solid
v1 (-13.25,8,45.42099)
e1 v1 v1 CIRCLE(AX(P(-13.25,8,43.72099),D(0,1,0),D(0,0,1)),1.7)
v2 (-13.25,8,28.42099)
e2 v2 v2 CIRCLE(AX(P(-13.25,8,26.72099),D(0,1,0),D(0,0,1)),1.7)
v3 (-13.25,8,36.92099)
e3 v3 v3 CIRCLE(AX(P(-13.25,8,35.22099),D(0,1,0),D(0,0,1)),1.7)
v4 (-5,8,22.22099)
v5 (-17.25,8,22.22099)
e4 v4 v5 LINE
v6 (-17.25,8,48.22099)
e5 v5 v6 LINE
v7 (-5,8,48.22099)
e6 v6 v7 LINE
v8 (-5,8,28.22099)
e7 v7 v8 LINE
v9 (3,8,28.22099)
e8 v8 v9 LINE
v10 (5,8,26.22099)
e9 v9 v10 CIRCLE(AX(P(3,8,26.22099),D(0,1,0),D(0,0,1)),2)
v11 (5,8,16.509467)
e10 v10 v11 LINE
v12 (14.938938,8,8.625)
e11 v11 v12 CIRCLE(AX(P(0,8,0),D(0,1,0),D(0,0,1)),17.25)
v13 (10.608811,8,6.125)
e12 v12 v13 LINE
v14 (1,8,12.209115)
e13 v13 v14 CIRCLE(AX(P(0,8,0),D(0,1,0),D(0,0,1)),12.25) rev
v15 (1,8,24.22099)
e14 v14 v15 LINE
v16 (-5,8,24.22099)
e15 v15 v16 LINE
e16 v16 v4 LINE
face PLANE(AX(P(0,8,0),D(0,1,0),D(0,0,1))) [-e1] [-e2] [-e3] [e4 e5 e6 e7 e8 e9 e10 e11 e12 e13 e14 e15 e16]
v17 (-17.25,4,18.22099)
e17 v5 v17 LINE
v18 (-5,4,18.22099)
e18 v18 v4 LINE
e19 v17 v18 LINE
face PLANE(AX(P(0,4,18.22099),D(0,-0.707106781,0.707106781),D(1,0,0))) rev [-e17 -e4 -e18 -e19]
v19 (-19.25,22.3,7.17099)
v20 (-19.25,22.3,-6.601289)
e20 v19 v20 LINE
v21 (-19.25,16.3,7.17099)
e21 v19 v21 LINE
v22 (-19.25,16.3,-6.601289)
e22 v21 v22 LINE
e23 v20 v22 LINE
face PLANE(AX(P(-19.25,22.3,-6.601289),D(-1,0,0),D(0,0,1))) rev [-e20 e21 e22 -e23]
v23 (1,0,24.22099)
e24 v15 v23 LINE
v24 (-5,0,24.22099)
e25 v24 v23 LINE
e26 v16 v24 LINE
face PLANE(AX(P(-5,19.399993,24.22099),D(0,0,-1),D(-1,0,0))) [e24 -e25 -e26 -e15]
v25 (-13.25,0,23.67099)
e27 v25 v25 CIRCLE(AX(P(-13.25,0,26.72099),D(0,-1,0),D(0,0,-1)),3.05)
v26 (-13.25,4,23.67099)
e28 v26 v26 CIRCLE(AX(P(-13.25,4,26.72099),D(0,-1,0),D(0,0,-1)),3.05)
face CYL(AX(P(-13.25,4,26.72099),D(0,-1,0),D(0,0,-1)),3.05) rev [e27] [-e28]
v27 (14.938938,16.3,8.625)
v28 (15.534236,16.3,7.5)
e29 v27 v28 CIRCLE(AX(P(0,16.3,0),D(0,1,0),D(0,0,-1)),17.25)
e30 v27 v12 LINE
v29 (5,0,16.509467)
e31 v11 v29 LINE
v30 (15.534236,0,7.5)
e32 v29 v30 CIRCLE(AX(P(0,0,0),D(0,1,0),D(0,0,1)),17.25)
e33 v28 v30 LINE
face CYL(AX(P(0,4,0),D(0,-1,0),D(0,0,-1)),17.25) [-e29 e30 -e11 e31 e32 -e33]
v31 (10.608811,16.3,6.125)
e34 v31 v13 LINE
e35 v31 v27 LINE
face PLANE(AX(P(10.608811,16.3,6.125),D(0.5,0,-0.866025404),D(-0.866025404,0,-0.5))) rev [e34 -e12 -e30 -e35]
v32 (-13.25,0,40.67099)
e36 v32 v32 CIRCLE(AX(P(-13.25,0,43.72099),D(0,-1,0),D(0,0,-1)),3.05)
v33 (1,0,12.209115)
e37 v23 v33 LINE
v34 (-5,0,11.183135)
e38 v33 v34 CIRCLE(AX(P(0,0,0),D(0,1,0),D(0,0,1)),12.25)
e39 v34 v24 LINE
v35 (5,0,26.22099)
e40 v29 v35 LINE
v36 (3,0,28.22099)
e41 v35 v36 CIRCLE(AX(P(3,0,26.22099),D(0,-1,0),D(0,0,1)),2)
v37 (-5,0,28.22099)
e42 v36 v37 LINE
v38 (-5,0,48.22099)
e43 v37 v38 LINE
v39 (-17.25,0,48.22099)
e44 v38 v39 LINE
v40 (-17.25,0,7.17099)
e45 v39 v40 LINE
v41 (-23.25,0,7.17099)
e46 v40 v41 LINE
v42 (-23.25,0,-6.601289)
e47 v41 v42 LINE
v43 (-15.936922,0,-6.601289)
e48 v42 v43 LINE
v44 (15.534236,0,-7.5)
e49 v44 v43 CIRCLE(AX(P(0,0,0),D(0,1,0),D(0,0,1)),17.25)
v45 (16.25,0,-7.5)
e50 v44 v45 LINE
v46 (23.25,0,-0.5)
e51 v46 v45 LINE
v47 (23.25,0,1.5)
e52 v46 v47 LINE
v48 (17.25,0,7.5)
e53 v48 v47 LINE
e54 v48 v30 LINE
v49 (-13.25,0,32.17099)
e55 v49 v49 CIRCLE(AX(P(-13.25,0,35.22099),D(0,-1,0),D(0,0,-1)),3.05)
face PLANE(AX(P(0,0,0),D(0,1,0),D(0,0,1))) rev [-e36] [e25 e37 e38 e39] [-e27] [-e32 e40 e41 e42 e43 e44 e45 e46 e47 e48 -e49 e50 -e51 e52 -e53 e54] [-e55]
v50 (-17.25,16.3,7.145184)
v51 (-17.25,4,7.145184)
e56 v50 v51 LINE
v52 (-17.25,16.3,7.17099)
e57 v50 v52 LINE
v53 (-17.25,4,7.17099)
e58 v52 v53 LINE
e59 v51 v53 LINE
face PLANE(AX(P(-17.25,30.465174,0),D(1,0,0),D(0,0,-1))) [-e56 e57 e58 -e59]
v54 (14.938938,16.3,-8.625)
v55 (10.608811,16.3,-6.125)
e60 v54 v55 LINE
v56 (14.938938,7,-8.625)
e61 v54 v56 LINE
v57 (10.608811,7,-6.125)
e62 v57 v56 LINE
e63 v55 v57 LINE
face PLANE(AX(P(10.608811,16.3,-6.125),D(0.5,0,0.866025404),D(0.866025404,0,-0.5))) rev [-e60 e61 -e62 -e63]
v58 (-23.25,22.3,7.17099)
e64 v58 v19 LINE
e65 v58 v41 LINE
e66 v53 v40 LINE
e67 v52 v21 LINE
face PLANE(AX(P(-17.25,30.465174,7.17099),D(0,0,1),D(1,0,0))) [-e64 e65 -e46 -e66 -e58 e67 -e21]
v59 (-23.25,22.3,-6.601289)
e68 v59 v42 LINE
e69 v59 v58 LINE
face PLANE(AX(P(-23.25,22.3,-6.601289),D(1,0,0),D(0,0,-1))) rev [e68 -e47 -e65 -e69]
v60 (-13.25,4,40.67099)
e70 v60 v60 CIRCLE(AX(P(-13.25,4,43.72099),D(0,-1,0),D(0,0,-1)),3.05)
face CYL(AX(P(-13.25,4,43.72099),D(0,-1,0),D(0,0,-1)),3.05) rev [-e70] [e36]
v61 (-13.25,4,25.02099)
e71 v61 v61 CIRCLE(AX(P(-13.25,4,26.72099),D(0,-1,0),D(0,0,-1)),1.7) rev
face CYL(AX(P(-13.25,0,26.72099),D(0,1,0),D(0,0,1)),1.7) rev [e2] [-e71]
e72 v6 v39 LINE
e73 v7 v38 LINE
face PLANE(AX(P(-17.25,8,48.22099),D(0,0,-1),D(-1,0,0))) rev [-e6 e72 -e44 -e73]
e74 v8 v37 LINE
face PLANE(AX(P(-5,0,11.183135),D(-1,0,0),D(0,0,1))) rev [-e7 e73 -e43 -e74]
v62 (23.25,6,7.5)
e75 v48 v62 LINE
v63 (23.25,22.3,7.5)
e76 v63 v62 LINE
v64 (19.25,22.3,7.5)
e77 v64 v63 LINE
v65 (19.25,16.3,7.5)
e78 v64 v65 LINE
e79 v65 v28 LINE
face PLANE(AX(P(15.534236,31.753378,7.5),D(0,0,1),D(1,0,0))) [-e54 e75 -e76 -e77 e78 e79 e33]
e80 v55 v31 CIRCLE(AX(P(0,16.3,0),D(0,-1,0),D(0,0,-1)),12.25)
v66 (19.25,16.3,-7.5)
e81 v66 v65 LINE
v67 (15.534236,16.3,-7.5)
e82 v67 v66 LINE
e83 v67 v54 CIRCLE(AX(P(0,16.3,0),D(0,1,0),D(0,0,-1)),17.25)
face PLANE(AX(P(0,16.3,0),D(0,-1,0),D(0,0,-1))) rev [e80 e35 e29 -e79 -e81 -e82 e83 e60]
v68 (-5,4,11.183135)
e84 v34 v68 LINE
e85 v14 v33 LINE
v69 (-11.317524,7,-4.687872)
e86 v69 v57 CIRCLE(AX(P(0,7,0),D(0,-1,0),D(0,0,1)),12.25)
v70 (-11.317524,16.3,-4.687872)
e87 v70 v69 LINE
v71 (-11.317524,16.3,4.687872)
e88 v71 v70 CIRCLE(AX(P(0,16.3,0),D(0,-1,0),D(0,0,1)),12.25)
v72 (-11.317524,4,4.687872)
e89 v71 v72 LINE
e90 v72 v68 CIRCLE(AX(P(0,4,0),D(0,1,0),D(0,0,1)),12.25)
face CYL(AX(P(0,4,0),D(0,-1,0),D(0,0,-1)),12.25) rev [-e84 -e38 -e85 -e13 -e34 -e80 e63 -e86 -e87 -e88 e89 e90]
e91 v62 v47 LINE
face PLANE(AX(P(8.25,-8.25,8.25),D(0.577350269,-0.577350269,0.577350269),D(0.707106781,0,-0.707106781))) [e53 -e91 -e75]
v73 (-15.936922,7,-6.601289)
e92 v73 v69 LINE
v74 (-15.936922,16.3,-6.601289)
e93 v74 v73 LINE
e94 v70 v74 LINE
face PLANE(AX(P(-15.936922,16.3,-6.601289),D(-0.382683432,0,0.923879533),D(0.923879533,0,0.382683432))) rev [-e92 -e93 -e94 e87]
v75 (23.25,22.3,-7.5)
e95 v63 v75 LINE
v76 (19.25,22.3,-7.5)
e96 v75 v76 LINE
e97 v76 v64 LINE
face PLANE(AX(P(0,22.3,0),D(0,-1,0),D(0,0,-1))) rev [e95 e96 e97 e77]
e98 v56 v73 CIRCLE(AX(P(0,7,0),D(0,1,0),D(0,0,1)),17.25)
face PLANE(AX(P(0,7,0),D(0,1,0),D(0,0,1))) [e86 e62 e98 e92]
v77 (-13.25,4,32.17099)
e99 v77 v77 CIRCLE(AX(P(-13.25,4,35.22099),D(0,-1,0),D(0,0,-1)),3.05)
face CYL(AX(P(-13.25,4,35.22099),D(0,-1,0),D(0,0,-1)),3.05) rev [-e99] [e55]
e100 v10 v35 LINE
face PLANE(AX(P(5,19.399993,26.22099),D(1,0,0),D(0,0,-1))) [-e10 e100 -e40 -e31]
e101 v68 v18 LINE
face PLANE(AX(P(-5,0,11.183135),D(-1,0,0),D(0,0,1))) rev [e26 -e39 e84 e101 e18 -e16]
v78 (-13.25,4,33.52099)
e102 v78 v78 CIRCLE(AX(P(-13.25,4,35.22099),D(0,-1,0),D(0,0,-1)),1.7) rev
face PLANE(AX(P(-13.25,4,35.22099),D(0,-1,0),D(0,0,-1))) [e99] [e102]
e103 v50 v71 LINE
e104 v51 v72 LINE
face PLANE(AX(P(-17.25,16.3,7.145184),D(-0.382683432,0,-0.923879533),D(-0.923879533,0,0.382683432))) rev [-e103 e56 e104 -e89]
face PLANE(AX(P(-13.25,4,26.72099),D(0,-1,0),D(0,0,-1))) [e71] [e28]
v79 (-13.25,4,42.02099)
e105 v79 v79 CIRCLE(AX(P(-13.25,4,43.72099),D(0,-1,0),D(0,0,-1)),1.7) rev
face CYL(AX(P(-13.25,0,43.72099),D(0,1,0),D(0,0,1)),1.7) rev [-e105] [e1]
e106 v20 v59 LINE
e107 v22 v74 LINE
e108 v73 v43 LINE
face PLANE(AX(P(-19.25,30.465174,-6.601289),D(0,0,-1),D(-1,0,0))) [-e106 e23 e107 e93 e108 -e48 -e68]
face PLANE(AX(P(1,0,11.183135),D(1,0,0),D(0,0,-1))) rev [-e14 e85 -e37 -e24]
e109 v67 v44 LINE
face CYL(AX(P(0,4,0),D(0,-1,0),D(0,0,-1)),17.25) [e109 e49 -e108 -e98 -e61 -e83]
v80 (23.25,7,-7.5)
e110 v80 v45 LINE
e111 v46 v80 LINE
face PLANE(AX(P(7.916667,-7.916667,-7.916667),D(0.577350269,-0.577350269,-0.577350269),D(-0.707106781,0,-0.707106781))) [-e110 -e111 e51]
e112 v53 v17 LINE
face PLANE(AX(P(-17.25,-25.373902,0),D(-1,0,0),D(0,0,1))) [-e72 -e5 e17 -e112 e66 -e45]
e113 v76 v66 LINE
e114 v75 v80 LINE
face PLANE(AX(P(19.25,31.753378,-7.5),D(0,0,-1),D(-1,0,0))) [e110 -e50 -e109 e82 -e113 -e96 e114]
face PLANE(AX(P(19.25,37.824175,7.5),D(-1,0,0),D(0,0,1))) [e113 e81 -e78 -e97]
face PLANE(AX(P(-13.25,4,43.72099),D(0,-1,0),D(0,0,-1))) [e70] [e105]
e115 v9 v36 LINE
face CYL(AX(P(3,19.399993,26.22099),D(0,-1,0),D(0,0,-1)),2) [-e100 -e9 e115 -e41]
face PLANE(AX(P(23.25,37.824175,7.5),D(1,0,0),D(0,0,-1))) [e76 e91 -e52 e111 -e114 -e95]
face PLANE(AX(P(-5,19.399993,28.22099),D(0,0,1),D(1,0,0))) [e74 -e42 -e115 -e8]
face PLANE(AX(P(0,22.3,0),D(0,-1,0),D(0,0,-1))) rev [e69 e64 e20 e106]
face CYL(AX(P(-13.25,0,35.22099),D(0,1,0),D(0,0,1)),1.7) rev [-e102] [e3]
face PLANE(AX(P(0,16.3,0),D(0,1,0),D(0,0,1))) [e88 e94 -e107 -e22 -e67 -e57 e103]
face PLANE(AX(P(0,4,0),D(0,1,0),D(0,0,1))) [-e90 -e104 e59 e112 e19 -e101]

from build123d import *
from build123d.topology import SkipClean

# Parameters (mm, degrees)
SKETCH1_R                = 17.25
SKETCH1_R_2              = 12.25
BOSS_EXTRUDE1_DEPTH      = 4
SKETCH2_W                = 6
SKETCH2_H                = 6.066865377
CUT_EXTRUDE1_DEPTH       = 25.720942539
BOSS_EXTRUDE2_START      = -4
BOSS_EXTRUDE2_DEPTH      = 4
BOSS_EXTRUDE3_DEPTH      = 12.3
BOSS_EXTRUDE4_DEPTH      = 4
BOSS_EXTRUDE4_DEPTH_BACK = 4
SKETCH5_W                = 12.25
SKETCH5_H                = 26
CUT_EXTRUDE2_DEPTH       = 53.669881205
CUT_EXTRUDE2_DEPTH_BACK  = 53.669881205
SKETCH6_R                = 1.7
SKETCH7_R                = 3.05
CUT_EXTRUDE6_DEPTH       = 4
CHAMFER1_SIZE            = 4
BOSS_EXTRUDE5_REACH      = 55.745
BOSS_EXTRUDE6_DEPTH      = 6
BOSS_EXTRUDE6_DEPTH_BACK = 16.3
SKETCH9_W                = 4
SKETCH9_H                = 13.772279307
BOSS_EXTRUDE7_DEPTH      = 4
BOSS_EXTRUDE8_DEPTH      = 16.3
SKETCH12_W               = 4
SKETCH12_H               = 15
BOSS_EXTRUDE9_DEPTH      = 22.3
CHAMFER2_START           = 13.712068893
CHAMFER2_OUTLINE_W       = 11
CHAMFER2_OUTLINE_H       = 13
CHAMFER2_DEPTH           = 5.287931107
CHAMFER3_START           = 14.289419162
CHAMFER3_OUTLINE_W       = 10
CHAMFER3_OUTLINE_H       = 11
CHAMFER3_DEPTH           = 10.664231106
BOSS_EXTRUDE10_DEPTH     = 3
BOSS_EXTRUDE11_DEPTH     = 4


with BuildPart() as part:
    # Sketch1 → Boss-Extrude1 (new body)
    with BuildSketch(Plane(origin=(0, 0, 0), x_dir=(1, 0, 0), z_dir=(0, 1, 0))):
        with Locations(Location((0, 0, 0), (0, 0, 270))):
            Circle(SKETCH1_R)
        with Locations(Location((0, 0, 0), (0, 0, 270))):
            Circle(SKETCH1_R_2, mode=Mode.SUBTRACT)
    extrude(amount=BOSS_EXTRUDE1_DEPTH)

    # Sketch2 → Cut-Extrude1 (cut, through all)
    with BuildSketch(Plane(origin=(0, 4, 0), x_dir=(1, 0, 0), z_dir=(0, 1, 0))):
        with Locations((-2, -14.216567312)):
            Rectangle(SKETCH2_W, SKETCH2_H)
    extrude(amount=-CUT_EXTRUDE1_DEPTH, mode=Mode.SUBTRACT)

    # Sketch3 → Boss-Extrude2 (add)
    with BuildSketch(Plane(origin=(0, 4, 0), x_dir=(1, 0, 0), z_dir=(0, 1, 0)).offset(BOSS_EXTRUDE2_START)):
        with BuildLine():
            Line((-5, -16.509466981), (-5, -22.220990099))
            Line((-5, -22.220990099), (-17.25, -22.220990099))
            Line((-17.25, -22.220990099), (-17.25, 0))
            ThreePointArc((-17.25, 0), (-13.853023136, -10.278922609), (-5, -16.509466981))
        make_face()
    extrude(amount=BOSS_EXTRUDE2_DEPTH)

    # Sketch4 → Boss-Extrude3 (add)
    with SkipClean():  # the faces are left unmerged after this step: merging them gives an invalid solid
        with BuildSketch(Plane(origin=(0, 4, 0), x_dir=(1, 0, 0), z_dir=(0, 1, 0))):
            with BuildLine():
                Line((-17.25, 0), (-17.25, -7.145183951))
                Line((-17.25, -7.145183951), (-11.317524273, -4.687872046))
                ThreePointArc((-11.317524273, -4.687872046), (-12.25, 0), (-11.317524273, 4.687872046))
                Line((-11.317524273, 4.687872046), (-15.936921936, 6.601289208))
                ThreePointArc((-15.936921936, 6.601289208), (-16.918546087, 3.365308055), (-17.25, 0))
            make_face()
            with BuildLine():
                Line((10.608811196, 6.125), (14.938938215, 8.625))
                ThreePointArc((14.938938215, 8.625), (17.25, 0), (14.938938215, -8.625))
                Line((14.938938215, -8.625), (10.608811196, -6.125))
                ThreePointArc((10.608811196, -6.125), (12.25, 0), (10.608811196, 6.125))
            make_face()
        extrude(amount=BOSS_EXTRUDE3_DEPTH)

    # Sketch5 → Boss-Extrude4 (add, two sides: drawn at the far end of the back side and taken through both)
    with SkipClean():  # the faces are left unmerged after this step: merging them gives an invalid solid
        with BuildSketch(Plane(origin=(0, 4, 0), x_dir=(1, 0, 0), z_dir=(0, 1, 0)).offset(-BOSS_EXTRUDE4_DEPTH_BACK)):
            with Locations((-11.125, -35.220990099)):
                Rectangle(SKETCH5_W, SKETCH5_H)
        extrude(amount=BOSS_EXTRUDE4_DEPTH + BOSS_EXTRUDE4_DEPTH_BACK)

    # Sketch6 → Cut-Extrude2 (cut, two sides: drawn at the far end of the back side and taken through both)
    with SkipClean():  # the faces are left unmerged after this step: merging them gives an invalid solid
        with BuildSketch(Plane(origin=(0, 4, 0), x_dir=(1, 0, 0), z_dir=(0, 1, 0)).offset(-CUT_EXTRUDE2_DEPTH_BACK)):
            with Locations(Location((-13.25, -43.720990099, 0), (0, 0, 270))):
                Circle(SKETCH6_R)
            with Locations(Location((-13.25, -35.220990099, 0), (0, 0, 270))):
                Circle(SKETCH6_R)
            with Locations(Location((-13.25, -26.720990099, 0), (0, 0, 270))):
                Circle(SKETCH6_R)
        extrude(amount=CUT_EXTRUDE2_DEPTH + CUT_EXTRUDE2_DEPTH_BACK, mode=Mode.SUBTRACT)

    # Sketch7 → Cut-Extrude6 (cut)
    with SkipClean():  # the faces are left unmerged after this step: merging them gives an invalid solid
        with BuildSketch(Plane.XZ):
            with Locations(Location((-13.25, 43.720990099, 0), (0, 0, 270))):
                Circle(SKETCH7_R)
            with Locations(Location((-13.25, 35.220990099, 0), (0, 0, 270))):
                Circle(SKETCH7_R)
            with Locations(Location((-13.25, 26.720990099, 0), (0, 0, 270))):
                Circle(SKETCH7_R)
        extrude(amount=-CUT_EXTRUDE6_DEPTH, mode=Mode.SUBTRACT)

    # Chamfer1
    chamfer1_edges = [part.edges().sort_by_distance(p)[0] for p in [
        (-11.125, 4, 22.220990099),
    ]]
    chamfer(chamfer1_edges, length=CHAMFER1_SIZE - 0.0001)  # a hair under: the kernel refuses the full size

    # Boss-Extrude5: up to this face of the body (flat: up to its plane)
    boss_extrude5_end = Plane(part.part.faces().sort_by_distance((-14.634101331, 16.3, 0.270569761))[0])
    # Sketch8 → Boss-Extrude5 (add, up to the picked face)
    with BuildSketch(Plane.XZ, mode=Mode.PRIVATE) as boss_extrude5_sk1:
        with BuildLine():
            Line((-17.25, 0), (-17.25, 7.170990099))
            Line((-17.25, 7.170990099), (-19.25, 7.170990099))
            Line((-19.25, 7.170990099), (-19.25, -6.601289208))
            Line((-19.25, -6.601289208), (-15.936921936, -6.601289208))
            ThreePointArc((-15.936921936, -6.601289208), (-16.918546087, -3.365308055), (-17.25, 0))
        make_face()
    boss_extrude5_tool1 = split(extrude(boss_extrude5_sk1.sketch, amount=-BOSS_EXTRUDE5_REACH, mode=Mode.PRIVATE), bisect_by=boss_extrude5_end, keep=Keep.BOTH, mode=Mode.PRIVATE)
    add(boss_extrude5_tool1.solids().sort_by(Axis((-18.119805, 0, -0.206337), (0, 1, 0)))[0])

    # Sketch9 → Boss-Extrude6 (add, two sides: drawn at the far end of the back side and taken through both)
    with BuildSketch(Plane(origin=(0, 16.3, 0), x_dir=(1, 0, 0), z_dir=(0, 1, 0)).offset(-BOSS_EXTRUDE6_DEPTH_BACK)):
        with Locations((-21.25, -0.284850446)):
            Rectangle(SKETCH9_W, SKETCH9_H)
    extrude(amount=BOSS_EXTRUDE6_DEPTH + BOSS_EXTRUDE6_DEPTH_BACK)

    # Sketch10 → Boss-Extrude7 (add)
    with BuildSketch(Plane.XZ):
        with BuildLine():
            Line((-5, 24.220990099), (1, 24.220990099))
            Line((1, 24.220990099), (1, 17.220990099))
            ThreePointArc((1, 17.220990099), (3.021020736, 16.983401712), (5, 16.509466981))
            Line((5, 16.509466981), (5, 26.220990099))
            ThreePointArc((5, 26.220990099), (4.414213562, 27.635203662), (3, 28.220990099))
            Line((3, 28.220990099), (-5, 28.220990099))
            Line((-5, 28.220990099), (-5, 24.220990099))
        make_face()
    extrude(amount=-BOSS_EXTRUDE7_DEPTH)

    # Sketch11 → Boss-Extrude8 (add)
    with BuildSketch(Plane.XZ):
        with BuildLine():
            Line((15.534236383, 7.5), (19.25, 7.5))
            Line((19.25, 7.5), (19.25, -7.5))
            Line((19.25, -7.5), (15.534236383, -7.5))
            ThreePointArc((15.534236383, -7.5), (17.25, 0), (15.534236383, 7.5))
        make_face()
    extrude(amount=-BOSS_EXTRUDE8_DEPTH)

    # Sketch12 → Boss-Extrude9 (add)
    with BuildSketch(Plane.XZ):
        with Locations((21.25, 0)):
            Rectangle(SKETCH12_W, SKETCH12_H)
    extrude(amount=-BOSS_EXTRUDE9_DEPTH)

    # Chamfer2: read off the stored shape, not the designer's step
    # Chamfer2 outline → Chamfer2 (cut)
    with BuildSketch(Plane(origin=(0, 0, 0), x_dir=(0.8164965809277258, 0.40824829046386313, 0.40824829046386313), z_dir=(0.5773502691896258, -0.5773502691896258, -0.5773502691896258)).offset(CHAMFER2_START)):
        with Locations((14.5, -5.5)):
            Rectangle(CHAMFER2_OUTLINE_W, CHAMFER2_OUTLINE_H)
    extrude(amount=CHAMFER2_DEPTH, mode=Mode.SUBTRACT)

    # Chamfer3: read off the stored shape, not the designer's step
    # Chamfer3 outline → Chamfer3 (cut)
    with BuildSketch(Plane(origin=(0, 0, 0), x_dir=(0.8164965809277258, 0.40824829046386313, -0.40824829046386313), z_dir=(0.5773502691896258, -0.5773502691896258, 0.5773502691896258)).offset(CHAMFER3_START)):
        with Locations((15, 5.5)):
            Rectangle(CHAMFER3_OUTLINE_W, CHAMFER3_OUTLINE_H)
    extrude(amount=CHAMFER3_DEPTH, mode=Mode.SUBTRACT)

    # Sketch13 → Boss-Extrude10 (add)
    with BuildSketch(Plane(origin=(0, 4, 0), x_dir=(1, 0, 0), z_dir=(0, 1, 0))):
        with BuildLine():
            Line((-15.936921936, 6.601289208), (-11.317524273, 4.687872046))
            ThreePointArc((-11.317524273, 4.687872046), (-0.801188333, 12.22377181), (10.608811196, 6.125))
            Line((10.608811196, 6.125), (14.938938215, 8.625))
            ThreePointArc((14.938938215, 8.625), (-1.128203979, 17.213066426), (-15.936921936, 6.601289208))
        make_face()
    extrude(amount=BOSS_EXTRUDE10_DEPTH)

    # Sketch14 → Boss-Extrude11 (add)
    with BuildSketch(Plane(origin=(0, 4, 0), x_dir=(1, 0, 0), z_dir=(0, 1, 0))):
        with BuildLine():
            Line((14.938938215, -8.625), (10.608811196, -6.125))
            ThreePointArc((10.608811196, -6.125), (6.553261748, -10.349746879), (1, -12.209115447))
            Line((1, -12.209115447), (1, -24.220990099))
            Line((1, -24.220990099), (-5, -24.220990099))
            Line((-5, -24.220990099), (-5, -28.220990099))
            Line((-5, -28.220990099), (3, -28.220990099))
            ThreePointArc((3, -28.220990099), (4.414213562, -27.635203662), (5, -26.220990099))
            Line((5, -26.220990099), (5, -16.509466981))
            ThreePointArc((5, -16.509466981), (10.720611885, -13.514103034), (14.938938215, -8.625))
        make_face()
    extrude(amount=BOSS_EXTRUDE11_DEPTH)


solid = part.part
